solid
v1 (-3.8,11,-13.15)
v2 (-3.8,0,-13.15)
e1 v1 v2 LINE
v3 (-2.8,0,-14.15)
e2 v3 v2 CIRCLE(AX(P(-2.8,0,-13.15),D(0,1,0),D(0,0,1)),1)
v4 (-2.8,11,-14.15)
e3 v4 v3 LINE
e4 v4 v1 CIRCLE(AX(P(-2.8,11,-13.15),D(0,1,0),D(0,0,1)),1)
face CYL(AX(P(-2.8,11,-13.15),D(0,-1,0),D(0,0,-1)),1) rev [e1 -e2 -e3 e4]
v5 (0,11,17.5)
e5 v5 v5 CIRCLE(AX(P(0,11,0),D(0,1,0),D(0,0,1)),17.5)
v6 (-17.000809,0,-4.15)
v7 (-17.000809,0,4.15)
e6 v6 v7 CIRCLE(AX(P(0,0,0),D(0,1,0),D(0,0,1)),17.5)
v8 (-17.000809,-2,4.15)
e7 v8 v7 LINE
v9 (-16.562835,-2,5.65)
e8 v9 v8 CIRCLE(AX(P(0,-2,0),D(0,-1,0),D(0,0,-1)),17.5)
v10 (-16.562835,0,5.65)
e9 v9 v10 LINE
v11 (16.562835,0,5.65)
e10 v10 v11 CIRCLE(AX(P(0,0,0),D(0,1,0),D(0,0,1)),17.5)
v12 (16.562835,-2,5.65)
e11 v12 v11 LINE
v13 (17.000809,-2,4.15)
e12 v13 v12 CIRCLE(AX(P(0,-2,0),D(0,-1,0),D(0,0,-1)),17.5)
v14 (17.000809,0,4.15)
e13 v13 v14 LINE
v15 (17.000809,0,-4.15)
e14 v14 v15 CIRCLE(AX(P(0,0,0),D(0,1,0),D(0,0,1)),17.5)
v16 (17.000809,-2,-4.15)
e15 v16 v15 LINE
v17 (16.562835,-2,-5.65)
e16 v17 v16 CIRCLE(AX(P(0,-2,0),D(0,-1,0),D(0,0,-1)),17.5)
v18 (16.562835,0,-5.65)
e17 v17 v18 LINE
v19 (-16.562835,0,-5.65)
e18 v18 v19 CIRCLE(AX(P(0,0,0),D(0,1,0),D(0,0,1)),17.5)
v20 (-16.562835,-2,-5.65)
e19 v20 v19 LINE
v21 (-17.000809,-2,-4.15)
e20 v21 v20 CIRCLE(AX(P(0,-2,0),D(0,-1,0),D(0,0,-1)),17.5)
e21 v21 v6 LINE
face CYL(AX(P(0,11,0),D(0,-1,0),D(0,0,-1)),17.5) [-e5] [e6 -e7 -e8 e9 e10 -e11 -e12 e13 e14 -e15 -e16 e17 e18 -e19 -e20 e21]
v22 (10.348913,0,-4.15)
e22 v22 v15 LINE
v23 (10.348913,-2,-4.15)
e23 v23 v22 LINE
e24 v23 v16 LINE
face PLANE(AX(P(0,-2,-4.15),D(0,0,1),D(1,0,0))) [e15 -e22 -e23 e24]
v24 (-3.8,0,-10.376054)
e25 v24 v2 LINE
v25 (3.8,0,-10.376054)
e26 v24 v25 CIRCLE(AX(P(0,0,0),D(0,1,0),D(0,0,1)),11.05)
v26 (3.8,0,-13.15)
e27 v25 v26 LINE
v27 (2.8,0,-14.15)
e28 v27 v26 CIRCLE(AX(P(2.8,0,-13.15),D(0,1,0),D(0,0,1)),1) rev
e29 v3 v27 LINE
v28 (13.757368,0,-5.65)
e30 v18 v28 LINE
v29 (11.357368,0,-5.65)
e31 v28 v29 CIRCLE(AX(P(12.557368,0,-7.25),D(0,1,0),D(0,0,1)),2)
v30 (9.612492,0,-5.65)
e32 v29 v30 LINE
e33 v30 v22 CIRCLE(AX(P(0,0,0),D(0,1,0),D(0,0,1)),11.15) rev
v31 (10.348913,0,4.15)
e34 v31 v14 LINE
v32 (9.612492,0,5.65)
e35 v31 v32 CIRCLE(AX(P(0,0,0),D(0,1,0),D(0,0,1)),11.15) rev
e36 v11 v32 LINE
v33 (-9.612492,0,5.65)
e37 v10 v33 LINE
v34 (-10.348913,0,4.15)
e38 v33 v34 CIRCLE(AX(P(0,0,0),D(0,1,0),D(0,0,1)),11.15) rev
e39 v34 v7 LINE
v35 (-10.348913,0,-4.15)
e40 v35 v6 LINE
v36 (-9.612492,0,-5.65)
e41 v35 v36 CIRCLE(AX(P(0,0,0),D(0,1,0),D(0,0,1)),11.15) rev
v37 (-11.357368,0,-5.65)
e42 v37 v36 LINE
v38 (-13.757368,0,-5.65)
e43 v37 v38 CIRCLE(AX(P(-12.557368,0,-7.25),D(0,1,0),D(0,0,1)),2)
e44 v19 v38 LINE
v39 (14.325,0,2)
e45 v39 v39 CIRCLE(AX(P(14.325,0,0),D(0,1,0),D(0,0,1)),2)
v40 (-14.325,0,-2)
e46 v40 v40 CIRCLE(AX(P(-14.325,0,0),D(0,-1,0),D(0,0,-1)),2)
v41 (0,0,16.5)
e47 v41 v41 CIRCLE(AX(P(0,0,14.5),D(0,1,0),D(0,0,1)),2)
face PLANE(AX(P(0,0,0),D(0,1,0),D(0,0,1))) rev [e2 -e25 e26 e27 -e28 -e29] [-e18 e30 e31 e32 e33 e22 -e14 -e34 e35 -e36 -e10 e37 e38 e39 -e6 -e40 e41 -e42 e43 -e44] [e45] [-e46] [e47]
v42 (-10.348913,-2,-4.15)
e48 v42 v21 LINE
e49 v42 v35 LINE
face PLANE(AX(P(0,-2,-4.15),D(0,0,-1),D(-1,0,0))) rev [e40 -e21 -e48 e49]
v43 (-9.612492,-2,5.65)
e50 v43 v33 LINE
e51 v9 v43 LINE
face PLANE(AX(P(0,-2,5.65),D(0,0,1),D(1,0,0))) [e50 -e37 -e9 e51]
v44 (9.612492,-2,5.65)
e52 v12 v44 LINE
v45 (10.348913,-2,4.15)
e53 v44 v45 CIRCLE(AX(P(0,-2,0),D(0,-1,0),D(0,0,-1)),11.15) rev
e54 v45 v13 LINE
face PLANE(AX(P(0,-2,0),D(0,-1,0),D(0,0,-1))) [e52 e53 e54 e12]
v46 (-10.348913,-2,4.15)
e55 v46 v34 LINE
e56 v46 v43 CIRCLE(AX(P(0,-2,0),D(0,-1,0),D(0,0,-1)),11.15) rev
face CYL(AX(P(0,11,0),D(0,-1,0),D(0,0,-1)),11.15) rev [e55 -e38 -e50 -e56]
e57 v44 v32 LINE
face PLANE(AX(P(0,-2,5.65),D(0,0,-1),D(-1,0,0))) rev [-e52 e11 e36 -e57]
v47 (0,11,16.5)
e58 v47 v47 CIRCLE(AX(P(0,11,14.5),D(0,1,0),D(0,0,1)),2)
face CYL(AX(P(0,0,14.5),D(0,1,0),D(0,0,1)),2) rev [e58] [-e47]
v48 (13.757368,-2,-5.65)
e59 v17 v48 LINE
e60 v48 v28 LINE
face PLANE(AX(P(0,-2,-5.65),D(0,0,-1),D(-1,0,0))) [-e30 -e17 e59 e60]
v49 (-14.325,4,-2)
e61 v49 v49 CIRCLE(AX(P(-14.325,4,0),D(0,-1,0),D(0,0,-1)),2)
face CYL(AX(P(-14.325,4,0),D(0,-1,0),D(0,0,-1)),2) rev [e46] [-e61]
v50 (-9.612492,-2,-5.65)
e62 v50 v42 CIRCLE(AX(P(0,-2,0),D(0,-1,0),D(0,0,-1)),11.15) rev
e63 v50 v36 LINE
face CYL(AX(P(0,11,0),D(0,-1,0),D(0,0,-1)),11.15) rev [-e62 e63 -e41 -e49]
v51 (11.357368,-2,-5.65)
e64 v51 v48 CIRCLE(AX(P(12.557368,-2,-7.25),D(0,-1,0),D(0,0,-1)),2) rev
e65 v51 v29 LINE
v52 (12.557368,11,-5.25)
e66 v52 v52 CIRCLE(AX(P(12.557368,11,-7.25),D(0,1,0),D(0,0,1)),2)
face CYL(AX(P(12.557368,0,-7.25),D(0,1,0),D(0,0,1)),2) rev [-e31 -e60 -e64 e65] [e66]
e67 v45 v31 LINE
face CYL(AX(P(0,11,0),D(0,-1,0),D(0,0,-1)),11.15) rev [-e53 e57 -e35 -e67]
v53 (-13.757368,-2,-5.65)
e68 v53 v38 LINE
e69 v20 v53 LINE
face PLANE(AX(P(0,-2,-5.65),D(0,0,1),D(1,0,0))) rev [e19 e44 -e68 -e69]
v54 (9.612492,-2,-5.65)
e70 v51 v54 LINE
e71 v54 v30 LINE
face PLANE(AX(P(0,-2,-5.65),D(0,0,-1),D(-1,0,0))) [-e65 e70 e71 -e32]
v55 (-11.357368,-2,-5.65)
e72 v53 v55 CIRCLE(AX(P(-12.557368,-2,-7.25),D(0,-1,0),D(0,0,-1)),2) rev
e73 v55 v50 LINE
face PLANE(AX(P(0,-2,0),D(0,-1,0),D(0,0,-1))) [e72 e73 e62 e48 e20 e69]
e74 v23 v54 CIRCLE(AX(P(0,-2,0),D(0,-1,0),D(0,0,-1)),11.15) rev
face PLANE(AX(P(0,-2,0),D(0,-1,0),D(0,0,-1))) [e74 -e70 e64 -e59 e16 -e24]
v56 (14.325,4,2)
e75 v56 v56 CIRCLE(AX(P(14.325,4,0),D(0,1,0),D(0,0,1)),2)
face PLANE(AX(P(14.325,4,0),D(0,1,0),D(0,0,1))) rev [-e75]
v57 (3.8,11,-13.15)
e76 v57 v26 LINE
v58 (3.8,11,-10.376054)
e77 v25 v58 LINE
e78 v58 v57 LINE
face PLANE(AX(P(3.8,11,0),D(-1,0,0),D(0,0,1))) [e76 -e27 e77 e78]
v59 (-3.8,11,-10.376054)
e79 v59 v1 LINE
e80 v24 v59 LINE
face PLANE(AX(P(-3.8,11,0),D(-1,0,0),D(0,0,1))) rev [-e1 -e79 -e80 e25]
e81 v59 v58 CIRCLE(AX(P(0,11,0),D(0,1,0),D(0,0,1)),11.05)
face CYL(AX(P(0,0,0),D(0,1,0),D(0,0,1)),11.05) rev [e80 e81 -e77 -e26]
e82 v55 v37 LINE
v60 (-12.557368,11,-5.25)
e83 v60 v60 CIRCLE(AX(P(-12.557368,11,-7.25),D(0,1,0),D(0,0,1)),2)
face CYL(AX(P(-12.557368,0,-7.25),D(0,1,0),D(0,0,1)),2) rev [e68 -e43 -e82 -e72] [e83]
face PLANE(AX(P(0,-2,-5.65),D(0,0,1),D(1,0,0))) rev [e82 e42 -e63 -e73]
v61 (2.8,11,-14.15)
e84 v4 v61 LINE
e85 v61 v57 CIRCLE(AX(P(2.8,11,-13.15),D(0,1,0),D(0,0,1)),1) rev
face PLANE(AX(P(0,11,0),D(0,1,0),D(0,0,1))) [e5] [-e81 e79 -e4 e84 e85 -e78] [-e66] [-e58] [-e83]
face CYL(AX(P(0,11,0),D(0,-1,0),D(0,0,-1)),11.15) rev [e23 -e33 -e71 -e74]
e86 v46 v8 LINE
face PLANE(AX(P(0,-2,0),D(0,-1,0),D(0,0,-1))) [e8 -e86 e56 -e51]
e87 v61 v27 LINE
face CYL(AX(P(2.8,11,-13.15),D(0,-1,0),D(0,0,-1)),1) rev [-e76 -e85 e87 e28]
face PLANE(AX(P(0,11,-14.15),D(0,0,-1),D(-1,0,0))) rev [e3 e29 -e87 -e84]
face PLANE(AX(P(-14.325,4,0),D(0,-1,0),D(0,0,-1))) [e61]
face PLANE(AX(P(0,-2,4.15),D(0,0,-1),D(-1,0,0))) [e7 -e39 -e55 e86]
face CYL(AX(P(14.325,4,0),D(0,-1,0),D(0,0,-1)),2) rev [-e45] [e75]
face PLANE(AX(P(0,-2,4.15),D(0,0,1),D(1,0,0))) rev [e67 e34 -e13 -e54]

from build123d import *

# Parameters (mm, degrees)
CROQUIS1_R              = 17.5
SALIENTE_EXTRUIR1_DEPTH = 11
CROQUIS4_R              = 2
CORTAR_EXTRUIR2_DEPTH   = 28.083205128
CROQUIS6_R              = 2
CORTAR_EXTRUIR3_DEPTH   = 4
SALIENTE_EXTRUIR3_DEPTH = 2
SALIENTE_EXTRUIR4_START = -11
SALIENTE_EXTRUIR4_DEPTH = 11


# Read off the part's stored shape, not the designer's step: Saliente-Extruir3
with BuildPart() as part:
    # Croquis1 → Saliente-Extruir1 (new body)
    with BuildSketch(Plane(origin=(0, 0, 0), x_dir=(1, 0, 0), z_dir=(0, 1, 0))):
        with Locations(Location((0, 0, 0), (0, 0, 270))):
            Circle(CROQUIS1_R)
        with BuildLine():
            ThreePointArc((11.15, 0), (-6.401269405, -9.129416739), (-3.8, 10.482485392))
            Line((-3.8, 10.482485392), (-3.8, 13.15))
            ThreePointArc((-3.8, 13.15), (-3.507106781, 13.857106781), (-2.8, 14.15))
            Line((-2.8, 14.15), (2.8, 14.15))
            ThreePointArc((2.8, 14.15), (3.507106781, 13.857106781), (3.8, 13.15))
            Line((3.8, 13.15), (3.8, 10.482485392))
            ThreePointArc((3.8, 10.482485392), (9.129416739, 6.401269405), (11.15, 0))
        make_face(mode=Mode.SUBTRACT)
    extrude(amount=SALIENTE_EXTRUIR1_DEPTH)

    # Croquis4 → Cortar-Extruir2 (cut, through all)
    with BuildSketch(Plane(origin=(0, 11, 0), x_dir=(1, 0, 0), z_dir=(0, 1, 0))):
        with Locations(Location((-12.557368355, 7.25, 0), (0, 0, 270))):
            Circle(CROQUIS4_R)
        with Locations(Location((12.557368355, 7.25, 0), (0, 0, 270))):
            Circle(CROQUIS4_R)
        with Locations(Location((0, -14.5, 0), (0, 0, 270))):
            Circle(CROQUIS4_R)
    extrude(amount=-CORTAR_EXTRUIR2_DEPTH, mode=Mode.SUBTRACT)

    # Croquis6 → Cortar-Extruir3 (cut)
    with BuildSketch(Plane(origin=(0, 0, 0), x_dir=(-1, 0, 0), z_dir=(0, -1, 0))):
        with Locations(Location((14.325, 0, 0), (0, 0, 90))):
            Circle(CROQUIS6_R)
        with Locations(Location((-14.325, 0, 0), (0, 0, 270))):
            Circle(CROQUIS6_R)
    extrude(amount=-CORTAR_EXTRUIR3_DEPTH, mode=Mode.SUBTRACT)

    # Saliente-Extruir3 outline → Saliente-Extruir3 (add)
    with BuildSketch(Plane(origin=(0, 0, 0), x_dir=(-1, 0, 0), z_dir=(0, -1, 0))):
        with BuildLine():
            ThreePointArc((-10.348912986, 4.15), (-10.00884214, 4.913815118), (-9.612491872, 5.65))
            Line((-9.612491872, 5.65), (-11.357368355, 5.65))
            ThreePointArc((-11.357368355, 5.65), (-12.557368355, 5.25), (-13.757368355, 5.65))
            Line((-13.757368355, 5.65), (-16.562834902, 5.65))
            ThreePointArc((-16.562834902, 5.65), (-16.798572699, 4.904890956), (-17.000808804, 4.15))
            Line((-17.000808804, 4.15), (-10.348912986, 4.15))
        make_face()
        with BuildLine():
            ThreePointArc((-9.612491873, -5.65), (-10.00884214, -4.913815118), (-10.348912986, -4.15))
            Line((-10.348912986, -4.15), (-17.000808804, -4.15))
            ThreePointArc((-17.000808804, -4.15), (-16.798572699, -4.904890956), (-16.562834902, -5.65))
            Line((-16.562834902, -5.65), (-9.612491873, -5.65))
        make_face()
        with BuildLine():
            ThreePointArc((10.348912986, -4.15), (10.00884214, -4.913815118), (9.612491873, -5.65))
            Line((9.612491873, -5.65), (16.562834902, -5.65))
            ThreePointArc((16.562834902, -5.65), (16.798572699, -4.904890956), (17.000808804, -4.15))
            Line((17.000808804, -4.15), (10.348912986, -4.15))
        make_face()
        with BuildLine():
            ThreePointArc((17.000808804, 4.15), (16.798572699, 4.904890956), (16.562834902, 5.65))
            Line((16.562834902, 5.65), (13.757368355, 5.65))
            ThreePointArc((13.757368355, 5.65), (12.557368355, 5.25), (11.357368355, 5.65))
            Line((11.357368355, 5.65), (9.612491872, 5.65))
            ThreePointArc((9.612491872, 5.65), (10.00884214, 4.913815118), (10.348912986, 4.15))
            Line((10.348912986, 4.15), (17.000808804, 4.15))
        make_face()
    extrude(amount=SALIENTE_EXTRUIR3_DEPTH)

    # Croquis11 → Saliente-Extruir4 (add)
    with BuildSketch(Plane(origin=(0, 11, 0), x_dir=(1, 0, 0), z_dir=(0, 1, 0)).offset(SALIENTE_EXTRUIR4_START)):
        with BuildLine():
            Line((-3.8, 10.376054163), (-3.8, 10.482485392))
            ThreePointArc((-3.8, 10.482485392), (-6.401269405, -9.129416739), (11.15, 0))
            ThreePointArc((11.15, 0), (9.129416739, 6.401269405), (3.8, 10.482485392))
            Line((3.8, 10.482485392), (3.8, 10.376054163))
            ThreePointArc((3.8, 10.376054163), (9.057938507, 6.329000711), (11.05, 0))
            ThreePointArc((11.05, 0), (-6.329000711, -9.057938507), (-3.8, 10.376054163))
        make_face()
    extrude(amount=SALIENTE_EXTRUIR4_DEPTH)


solid = part.part
